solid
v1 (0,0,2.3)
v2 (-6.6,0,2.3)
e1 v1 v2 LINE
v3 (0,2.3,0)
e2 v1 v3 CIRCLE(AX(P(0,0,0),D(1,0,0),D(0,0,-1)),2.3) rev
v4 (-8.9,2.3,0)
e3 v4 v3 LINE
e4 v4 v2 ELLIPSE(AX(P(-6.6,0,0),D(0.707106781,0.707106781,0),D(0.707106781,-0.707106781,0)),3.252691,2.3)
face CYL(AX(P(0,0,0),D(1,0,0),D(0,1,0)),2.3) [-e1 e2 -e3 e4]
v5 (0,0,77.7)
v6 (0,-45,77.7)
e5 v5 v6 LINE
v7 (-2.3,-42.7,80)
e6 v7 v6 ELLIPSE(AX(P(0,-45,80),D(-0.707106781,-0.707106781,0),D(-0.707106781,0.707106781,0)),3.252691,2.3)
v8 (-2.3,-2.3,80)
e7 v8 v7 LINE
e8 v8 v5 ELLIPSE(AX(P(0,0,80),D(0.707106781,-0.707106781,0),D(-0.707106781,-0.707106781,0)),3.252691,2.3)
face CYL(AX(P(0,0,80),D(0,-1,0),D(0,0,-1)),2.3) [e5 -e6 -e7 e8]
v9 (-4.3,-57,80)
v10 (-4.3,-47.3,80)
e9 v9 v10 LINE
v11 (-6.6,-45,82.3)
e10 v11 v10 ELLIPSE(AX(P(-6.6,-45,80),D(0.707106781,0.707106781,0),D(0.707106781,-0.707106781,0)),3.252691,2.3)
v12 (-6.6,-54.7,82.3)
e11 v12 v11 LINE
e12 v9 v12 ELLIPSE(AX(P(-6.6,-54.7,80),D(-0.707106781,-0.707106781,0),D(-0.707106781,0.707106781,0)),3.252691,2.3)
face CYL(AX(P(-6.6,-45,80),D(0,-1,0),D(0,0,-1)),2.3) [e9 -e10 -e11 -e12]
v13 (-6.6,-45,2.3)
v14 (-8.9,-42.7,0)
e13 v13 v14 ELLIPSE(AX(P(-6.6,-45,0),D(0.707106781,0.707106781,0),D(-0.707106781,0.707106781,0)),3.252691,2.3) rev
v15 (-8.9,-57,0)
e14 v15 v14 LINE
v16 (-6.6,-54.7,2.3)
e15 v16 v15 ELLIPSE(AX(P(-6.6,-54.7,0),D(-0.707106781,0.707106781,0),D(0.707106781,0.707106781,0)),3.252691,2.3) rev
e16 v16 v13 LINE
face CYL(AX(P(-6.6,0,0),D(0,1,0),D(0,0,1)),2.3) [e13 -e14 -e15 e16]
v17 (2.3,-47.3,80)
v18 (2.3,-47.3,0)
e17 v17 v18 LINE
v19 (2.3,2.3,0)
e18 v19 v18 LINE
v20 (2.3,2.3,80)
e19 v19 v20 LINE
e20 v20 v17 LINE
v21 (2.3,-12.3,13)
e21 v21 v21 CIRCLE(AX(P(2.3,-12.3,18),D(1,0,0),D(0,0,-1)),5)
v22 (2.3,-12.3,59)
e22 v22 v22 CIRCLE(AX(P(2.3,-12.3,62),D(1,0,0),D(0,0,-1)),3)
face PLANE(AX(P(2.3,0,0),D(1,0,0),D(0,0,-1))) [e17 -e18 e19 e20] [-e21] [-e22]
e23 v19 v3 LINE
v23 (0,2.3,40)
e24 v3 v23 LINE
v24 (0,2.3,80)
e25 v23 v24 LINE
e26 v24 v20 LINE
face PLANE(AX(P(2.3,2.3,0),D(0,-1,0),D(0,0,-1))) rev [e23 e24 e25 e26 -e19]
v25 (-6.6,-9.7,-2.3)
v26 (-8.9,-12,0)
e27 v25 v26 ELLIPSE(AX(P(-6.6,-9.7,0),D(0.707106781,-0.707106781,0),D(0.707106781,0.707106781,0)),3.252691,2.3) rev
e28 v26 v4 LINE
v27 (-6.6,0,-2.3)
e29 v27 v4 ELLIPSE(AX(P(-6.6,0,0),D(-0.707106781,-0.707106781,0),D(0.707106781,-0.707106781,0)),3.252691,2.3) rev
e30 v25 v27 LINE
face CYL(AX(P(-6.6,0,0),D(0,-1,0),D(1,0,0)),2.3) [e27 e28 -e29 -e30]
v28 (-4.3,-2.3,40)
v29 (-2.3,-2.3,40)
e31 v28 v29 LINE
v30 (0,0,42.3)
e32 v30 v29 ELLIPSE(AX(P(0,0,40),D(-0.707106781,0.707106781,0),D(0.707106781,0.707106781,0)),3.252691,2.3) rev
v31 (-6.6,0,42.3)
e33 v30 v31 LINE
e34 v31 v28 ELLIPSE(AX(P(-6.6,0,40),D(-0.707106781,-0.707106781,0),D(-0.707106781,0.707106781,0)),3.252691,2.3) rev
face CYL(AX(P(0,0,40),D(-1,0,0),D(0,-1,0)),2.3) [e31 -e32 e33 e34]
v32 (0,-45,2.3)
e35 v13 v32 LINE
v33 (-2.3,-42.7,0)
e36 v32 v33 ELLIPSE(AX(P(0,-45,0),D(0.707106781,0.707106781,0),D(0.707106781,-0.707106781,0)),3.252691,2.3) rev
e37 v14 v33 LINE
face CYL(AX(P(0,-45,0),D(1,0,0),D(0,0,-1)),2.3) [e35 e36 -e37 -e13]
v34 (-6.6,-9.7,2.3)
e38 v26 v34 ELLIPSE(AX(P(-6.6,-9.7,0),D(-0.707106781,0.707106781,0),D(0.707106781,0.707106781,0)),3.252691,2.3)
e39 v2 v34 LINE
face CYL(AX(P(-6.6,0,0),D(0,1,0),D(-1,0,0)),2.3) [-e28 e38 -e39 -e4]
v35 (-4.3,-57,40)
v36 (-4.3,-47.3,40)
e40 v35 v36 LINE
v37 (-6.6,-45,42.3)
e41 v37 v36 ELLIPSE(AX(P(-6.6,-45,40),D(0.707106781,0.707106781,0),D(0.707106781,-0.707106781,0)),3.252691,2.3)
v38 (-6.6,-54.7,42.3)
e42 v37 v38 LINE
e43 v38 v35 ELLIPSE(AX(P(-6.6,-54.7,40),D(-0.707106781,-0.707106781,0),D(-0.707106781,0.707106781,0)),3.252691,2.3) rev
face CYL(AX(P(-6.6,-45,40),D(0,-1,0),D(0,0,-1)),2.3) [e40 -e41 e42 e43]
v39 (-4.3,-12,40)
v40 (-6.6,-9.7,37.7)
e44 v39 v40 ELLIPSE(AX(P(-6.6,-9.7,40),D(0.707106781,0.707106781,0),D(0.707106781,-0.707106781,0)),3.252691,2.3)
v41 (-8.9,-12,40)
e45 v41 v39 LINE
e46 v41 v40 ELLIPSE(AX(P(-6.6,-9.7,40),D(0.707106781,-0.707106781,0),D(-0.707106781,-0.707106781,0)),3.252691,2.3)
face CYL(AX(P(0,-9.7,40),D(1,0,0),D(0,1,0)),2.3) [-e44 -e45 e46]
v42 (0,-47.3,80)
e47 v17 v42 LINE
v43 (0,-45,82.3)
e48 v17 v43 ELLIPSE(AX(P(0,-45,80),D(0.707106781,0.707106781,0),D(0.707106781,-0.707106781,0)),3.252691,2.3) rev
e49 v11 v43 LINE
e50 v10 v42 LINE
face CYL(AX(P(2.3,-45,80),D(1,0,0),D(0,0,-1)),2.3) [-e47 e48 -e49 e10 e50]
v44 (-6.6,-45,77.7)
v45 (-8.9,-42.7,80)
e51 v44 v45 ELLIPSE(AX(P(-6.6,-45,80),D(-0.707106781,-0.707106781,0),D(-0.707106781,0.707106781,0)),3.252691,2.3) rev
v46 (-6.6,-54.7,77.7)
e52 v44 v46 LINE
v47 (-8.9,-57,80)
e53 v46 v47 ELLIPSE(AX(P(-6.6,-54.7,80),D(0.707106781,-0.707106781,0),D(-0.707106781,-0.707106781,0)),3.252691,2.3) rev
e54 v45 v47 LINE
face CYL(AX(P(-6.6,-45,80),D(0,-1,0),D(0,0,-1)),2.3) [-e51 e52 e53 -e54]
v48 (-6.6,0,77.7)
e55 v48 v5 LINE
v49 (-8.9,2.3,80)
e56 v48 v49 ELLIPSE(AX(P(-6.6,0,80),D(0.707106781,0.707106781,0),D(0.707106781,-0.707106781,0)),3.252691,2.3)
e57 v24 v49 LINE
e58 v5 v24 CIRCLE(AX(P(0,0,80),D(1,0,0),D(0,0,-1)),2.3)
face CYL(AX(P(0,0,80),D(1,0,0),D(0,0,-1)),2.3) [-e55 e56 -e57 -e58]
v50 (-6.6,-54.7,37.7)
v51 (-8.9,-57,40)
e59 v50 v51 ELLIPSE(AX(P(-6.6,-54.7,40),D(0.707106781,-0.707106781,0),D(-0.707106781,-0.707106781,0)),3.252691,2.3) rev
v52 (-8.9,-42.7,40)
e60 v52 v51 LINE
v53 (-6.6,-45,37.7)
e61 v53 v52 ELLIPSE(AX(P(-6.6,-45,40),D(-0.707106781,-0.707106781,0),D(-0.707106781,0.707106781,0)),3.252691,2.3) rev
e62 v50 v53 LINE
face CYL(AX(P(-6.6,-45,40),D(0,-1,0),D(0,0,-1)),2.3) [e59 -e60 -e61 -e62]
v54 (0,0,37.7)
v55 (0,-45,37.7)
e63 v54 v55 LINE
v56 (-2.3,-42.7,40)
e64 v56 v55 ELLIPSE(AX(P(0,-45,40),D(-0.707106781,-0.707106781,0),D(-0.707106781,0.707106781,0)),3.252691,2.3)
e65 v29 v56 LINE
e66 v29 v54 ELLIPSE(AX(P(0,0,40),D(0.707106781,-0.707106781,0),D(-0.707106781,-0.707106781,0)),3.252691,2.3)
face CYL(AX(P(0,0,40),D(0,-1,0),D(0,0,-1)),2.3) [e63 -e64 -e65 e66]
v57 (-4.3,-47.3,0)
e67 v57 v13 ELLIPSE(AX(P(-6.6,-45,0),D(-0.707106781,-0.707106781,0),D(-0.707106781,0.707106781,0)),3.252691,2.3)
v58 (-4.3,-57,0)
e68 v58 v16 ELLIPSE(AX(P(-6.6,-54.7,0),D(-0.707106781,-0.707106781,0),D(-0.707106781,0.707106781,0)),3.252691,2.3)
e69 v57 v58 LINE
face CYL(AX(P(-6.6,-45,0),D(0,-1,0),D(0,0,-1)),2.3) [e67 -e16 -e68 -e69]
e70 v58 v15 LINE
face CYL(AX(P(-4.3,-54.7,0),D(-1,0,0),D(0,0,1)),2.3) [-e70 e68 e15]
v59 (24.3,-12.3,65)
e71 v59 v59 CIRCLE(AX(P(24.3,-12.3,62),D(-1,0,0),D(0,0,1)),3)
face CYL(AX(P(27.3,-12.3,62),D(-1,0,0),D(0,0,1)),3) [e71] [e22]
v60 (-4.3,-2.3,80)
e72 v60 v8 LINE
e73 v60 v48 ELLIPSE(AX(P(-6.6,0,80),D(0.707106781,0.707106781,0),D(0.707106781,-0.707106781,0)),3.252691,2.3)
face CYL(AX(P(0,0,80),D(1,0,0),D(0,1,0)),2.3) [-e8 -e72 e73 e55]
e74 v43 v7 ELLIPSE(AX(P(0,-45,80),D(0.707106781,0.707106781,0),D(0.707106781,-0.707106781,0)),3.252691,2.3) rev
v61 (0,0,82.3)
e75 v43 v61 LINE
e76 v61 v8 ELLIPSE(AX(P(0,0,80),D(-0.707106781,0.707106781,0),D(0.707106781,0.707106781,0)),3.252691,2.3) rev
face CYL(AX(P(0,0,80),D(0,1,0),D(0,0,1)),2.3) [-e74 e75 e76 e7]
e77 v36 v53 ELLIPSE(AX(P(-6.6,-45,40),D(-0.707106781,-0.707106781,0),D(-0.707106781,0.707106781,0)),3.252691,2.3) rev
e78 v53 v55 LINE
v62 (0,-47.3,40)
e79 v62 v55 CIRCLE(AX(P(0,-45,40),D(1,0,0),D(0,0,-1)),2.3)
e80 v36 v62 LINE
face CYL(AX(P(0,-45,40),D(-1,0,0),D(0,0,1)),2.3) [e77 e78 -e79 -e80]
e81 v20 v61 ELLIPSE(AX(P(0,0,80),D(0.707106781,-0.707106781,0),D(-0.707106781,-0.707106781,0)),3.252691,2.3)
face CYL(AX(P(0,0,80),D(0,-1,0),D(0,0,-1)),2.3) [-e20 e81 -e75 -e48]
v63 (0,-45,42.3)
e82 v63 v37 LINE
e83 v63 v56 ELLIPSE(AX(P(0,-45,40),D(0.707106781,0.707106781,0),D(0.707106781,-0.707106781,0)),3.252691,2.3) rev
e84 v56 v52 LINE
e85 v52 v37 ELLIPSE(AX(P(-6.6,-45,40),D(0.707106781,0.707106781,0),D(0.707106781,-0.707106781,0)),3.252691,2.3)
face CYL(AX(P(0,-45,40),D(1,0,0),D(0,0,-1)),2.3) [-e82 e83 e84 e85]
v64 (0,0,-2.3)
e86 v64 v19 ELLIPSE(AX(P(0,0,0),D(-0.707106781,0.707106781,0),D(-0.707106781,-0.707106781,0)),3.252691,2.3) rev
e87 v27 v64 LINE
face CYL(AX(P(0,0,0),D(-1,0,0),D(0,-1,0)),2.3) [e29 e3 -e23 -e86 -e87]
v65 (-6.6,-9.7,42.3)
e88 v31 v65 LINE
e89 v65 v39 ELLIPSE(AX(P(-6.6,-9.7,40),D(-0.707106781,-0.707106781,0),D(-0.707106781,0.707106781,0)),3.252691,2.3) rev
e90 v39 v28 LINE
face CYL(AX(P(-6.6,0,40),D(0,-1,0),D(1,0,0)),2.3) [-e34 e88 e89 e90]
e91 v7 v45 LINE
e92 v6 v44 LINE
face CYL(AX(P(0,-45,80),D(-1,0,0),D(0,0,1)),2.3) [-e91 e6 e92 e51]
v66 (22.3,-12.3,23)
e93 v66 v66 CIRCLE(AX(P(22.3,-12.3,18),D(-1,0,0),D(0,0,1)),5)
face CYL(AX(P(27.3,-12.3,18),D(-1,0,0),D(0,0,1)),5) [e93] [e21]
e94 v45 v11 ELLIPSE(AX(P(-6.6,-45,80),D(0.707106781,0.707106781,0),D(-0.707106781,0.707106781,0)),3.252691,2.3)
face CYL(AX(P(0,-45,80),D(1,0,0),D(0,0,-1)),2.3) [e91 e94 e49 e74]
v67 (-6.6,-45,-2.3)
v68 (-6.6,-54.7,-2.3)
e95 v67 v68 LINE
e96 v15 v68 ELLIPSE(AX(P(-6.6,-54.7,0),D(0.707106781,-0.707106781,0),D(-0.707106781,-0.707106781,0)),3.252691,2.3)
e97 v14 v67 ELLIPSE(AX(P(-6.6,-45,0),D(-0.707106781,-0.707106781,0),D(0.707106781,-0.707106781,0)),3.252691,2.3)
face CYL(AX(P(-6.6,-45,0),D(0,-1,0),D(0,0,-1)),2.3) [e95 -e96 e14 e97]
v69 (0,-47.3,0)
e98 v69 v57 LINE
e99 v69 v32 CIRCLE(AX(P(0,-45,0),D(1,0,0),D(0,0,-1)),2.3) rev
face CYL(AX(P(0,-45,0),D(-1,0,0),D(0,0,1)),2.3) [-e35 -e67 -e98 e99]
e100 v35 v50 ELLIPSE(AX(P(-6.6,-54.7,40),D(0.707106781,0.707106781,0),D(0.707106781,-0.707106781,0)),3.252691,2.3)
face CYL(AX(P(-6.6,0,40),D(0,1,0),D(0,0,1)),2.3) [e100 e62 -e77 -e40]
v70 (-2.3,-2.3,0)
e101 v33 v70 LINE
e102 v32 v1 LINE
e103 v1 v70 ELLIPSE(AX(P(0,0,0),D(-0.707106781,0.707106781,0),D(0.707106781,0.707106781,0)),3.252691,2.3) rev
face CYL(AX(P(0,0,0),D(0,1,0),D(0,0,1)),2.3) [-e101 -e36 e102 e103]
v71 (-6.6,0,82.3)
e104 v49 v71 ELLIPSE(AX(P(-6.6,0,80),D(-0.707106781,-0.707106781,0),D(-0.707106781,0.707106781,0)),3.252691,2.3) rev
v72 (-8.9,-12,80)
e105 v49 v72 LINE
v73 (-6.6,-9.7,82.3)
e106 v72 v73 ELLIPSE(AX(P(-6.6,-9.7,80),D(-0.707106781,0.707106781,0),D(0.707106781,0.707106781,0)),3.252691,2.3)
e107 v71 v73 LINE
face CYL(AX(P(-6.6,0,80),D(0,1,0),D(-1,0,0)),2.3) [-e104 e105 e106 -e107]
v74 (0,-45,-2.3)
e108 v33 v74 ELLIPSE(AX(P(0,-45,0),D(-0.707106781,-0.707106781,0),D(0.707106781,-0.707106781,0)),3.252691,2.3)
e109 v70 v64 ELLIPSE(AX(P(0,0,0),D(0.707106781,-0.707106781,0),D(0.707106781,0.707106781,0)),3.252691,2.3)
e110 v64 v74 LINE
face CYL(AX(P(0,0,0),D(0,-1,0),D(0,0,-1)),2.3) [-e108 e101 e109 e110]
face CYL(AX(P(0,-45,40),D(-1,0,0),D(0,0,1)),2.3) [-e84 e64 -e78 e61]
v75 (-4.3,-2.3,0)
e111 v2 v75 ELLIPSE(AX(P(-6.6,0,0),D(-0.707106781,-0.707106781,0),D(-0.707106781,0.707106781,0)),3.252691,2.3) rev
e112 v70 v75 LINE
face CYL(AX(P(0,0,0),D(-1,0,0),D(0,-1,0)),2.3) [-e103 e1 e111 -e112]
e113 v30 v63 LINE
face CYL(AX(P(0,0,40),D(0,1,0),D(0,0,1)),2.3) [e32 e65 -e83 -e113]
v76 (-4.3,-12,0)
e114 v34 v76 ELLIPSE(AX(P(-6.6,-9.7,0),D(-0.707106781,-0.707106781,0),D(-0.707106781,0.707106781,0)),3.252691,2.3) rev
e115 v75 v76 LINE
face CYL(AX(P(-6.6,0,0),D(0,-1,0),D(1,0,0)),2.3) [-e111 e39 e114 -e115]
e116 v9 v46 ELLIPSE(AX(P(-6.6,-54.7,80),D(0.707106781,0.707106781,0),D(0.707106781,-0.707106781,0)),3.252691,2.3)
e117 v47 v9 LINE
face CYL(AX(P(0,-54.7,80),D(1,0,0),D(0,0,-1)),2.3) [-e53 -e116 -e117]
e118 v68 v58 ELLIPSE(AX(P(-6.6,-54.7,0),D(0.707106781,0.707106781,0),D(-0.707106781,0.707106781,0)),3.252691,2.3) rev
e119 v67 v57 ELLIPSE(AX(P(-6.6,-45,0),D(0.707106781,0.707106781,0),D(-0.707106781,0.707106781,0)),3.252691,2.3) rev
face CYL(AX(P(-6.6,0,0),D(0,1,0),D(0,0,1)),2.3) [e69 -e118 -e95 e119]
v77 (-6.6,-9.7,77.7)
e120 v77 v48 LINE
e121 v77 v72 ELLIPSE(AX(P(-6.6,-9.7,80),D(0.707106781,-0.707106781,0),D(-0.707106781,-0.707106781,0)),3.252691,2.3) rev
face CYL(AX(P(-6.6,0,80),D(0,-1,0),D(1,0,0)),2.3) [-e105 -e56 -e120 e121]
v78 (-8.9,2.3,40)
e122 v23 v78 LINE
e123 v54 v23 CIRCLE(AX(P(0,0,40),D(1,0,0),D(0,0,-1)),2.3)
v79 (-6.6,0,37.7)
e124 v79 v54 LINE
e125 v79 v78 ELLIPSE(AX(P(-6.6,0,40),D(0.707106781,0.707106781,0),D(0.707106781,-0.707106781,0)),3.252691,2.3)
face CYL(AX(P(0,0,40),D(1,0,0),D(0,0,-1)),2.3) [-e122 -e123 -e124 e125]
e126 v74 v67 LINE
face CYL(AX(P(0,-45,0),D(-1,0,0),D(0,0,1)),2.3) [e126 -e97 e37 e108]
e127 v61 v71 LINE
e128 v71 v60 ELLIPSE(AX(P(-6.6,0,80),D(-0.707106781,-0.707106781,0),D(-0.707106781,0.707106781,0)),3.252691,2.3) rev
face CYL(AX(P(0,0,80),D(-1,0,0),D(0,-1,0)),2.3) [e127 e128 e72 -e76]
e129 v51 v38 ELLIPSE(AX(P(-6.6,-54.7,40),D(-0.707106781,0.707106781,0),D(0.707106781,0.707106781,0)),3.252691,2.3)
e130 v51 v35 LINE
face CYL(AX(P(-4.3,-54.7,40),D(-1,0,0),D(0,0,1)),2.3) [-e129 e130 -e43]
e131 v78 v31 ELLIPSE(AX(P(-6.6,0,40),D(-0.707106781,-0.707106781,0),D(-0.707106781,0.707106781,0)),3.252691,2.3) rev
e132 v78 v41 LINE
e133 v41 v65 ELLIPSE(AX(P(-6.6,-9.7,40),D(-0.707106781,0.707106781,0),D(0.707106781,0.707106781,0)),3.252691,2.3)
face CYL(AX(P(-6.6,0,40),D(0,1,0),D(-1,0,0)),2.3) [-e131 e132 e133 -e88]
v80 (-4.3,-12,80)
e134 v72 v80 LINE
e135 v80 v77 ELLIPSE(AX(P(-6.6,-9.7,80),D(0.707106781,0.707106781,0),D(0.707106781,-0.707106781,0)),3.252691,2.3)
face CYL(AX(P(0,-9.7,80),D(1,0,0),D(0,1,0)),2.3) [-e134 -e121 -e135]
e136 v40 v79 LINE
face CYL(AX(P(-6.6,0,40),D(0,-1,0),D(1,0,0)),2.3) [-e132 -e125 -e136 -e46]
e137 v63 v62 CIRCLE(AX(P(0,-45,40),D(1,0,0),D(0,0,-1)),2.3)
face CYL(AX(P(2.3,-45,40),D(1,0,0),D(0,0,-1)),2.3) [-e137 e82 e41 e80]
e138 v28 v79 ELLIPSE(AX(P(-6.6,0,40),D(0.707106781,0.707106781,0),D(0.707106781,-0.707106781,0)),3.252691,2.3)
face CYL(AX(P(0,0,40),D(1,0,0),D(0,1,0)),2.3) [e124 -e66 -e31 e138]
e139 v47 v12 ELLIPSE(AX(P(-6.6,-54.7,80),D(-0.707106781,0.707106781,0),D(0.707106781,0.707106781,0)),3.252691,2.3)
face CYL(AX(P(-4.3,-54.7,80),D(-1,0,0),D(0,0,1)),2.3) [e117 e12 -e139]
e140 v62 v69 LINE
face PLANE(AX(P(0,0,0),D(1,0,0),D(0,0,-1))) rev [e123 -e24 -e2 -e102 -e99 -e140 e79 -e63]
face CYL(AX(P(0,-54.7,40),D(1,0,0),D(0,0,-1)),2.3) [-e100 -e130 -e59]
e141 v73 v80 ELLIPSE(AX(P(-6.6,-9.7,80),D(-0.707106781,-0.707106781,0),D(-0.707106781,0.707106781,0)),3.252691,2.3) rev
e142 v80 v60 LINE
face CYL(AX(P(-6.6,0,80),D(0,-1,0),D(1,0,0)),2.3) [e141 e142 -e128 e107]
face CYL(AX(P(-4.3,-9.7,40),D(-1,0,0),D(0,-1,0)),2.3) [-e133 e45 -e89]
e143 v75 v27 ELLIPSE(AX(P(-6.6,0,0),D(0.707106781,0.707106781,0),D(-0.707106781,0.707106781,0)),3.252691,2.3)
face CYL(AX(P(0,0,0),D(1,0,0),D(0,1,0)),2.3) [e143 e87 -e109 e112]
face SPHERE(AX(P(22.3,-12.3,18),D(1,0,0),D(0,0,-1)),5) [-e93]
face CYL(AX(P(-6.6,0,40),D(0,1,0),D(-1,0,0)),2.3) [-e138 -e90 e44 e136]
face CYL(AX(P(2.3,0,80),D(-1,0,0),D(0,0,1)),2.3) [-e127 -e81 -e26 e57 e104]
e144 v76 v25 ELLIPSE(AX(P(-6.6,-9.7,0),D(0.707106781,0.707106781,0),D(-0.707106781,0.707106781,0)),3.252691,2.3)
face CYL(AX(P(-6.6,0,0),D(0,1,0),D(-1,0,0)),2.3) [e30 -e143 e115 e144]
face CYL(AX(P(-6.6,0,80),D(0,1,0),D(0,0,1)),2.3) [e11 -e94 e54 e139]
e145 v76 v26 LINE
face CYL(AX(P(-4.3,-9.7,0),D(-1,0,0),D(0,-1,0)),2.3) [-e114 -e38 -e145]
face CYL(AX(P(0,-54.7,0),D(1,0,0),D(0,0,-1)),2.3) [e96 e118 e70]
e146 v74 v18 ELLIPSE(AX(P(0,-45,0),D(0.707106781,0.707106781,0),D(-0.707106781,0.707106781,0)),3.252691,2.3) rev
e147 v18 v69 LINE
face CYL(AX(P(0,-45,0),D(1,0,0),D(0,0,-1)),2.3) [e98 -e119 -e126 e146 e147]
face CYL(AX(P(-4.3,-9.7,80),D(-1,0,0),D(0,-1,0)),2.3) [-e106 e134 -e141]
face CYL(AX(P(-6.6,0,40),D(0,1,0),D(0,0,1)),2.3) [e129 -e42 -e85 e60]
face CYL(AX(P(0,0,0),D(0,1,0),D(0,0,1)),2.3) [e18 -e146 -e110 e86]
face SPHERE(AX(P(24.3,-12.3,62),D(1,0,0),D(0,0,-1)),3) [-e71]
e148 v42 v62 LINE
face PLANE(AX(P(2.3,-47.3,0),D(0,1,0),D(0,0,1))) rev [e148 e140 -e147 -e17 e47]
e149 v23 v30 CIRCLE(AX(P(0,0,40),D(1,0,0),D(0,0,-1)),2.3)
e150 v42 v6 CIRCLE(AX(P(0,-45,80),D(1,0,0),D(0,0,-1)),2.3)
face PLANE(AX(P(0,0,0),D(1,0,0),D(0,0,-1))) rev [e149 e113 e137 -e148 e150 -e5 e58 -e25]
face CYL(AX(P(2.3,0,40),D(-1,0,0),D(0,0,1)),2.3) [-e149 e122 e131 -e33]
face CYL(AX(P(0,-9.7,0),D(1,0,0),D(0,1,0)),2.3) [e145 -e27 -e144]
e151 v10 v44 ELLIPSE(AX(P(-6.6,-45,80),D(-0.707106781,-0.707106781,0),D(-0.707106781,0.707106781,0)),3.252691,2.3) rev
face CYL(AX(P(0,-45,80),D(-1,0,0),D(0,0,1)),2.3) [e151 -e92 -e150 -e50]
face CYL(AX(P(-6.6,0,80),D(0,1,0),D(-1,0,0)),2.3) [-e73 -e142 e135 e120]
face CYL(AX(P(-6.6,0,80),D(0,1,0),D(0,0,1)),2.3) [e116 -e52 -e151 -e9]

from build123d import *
from OCP.BRepFilletAPI import BRepFilletAPI_MakeFillet

# Parameters (mm, degrees)
EXTRU_MINCE1_DEPTH           = 2.3
CONG_1_R                     = 2.3
ESQUISSE2_W                  = 80
ESQUISSE2_H                  = 49.6
BOSS_EXTRU_1_DEPTH           = 2.3
R_P_TITION_START             = 77.7
R_P_TITION_LIN_AIRE1_DEPTH   = 4.6
R_P_TITION_START_2           = 37.7
R_P_TITION_LIN_AIRE1_2_DEPTH = 4.6
CONG_2_R                     = 2.3
ESQUISSE3_R                  = 3
ESQUISSE3_R_2                = 5
BOSS_EXTRU_2_DEPTH           = 25
CONG_5_R1                    = 3
CONG_5_R2                    = 5


# Read off the part's stored shape, not the designer's step: Répétition linéaire1
with BuildPart() as part:
    # Esquisse1 → Extru.-Mince1 (new, symmetric)
    with BuildSketch(Plane.XY):
        Polygon((-4.3, -57), (-4.3, -47.3), (2.3, -47.3), (2.3, 2.3), (-8.9, 2.3), (-8.9, -12), (-4.3, -12), (-4.3, -2.3), (-2.3, -2.3), (-2.3, -42.7), (-8.9, -42.7), (-8.9, -57), align=None)
    extrude(amount=EXTRU_MINCE1_DEPTH, both=True)

    # Congé1
    cong_1_edges = [part.edges().sort_by_distance(p)[0] for p in [
        (-6.6, -57, -2.3),
        (-4.3, -52.15, -2.3),
        (-1, -47.3, -2.3),
        (2.3, -22.5, -2.3),
        (-3.3, 2.3, -2.3),
        (-8.9, -4.85, -2.3),
        (-6.6, -12, -2.3),
        (-4.3, -7.15, -2.3),
        (-3.3, -2.3, -2.3),
        (-2.3, -22.5, -2.3),
        (-5.6, -42.7, -2.3),
        (-8.9, -49.85, -2.3),
        (-5.6, -42.7, 2.3),
        (-2.3, -22.5, 2.3),
        (-3.3, -2.3, 2.3),
        (-4.3, -7.15, 2.3),
        (-6.6, -12, 2.3),
        (-8.9, -4.85, 2.3),
        (-3.3, 2.3, 2.3),
        (2.3, -22.5, 2.3),
        (-1, -47.3, 2.3),
        (-4.3, -52.15, 2.3),
        (-6.6, -57, 2.3),
        (-8.9, -49.85, 2.3),
    ]]
    fillet(cong_1_edges, radius=CONG_1_R - 0.0001)  # a hair under: the kernel refuses the full size

    # Esquisse2 → Boss.-Extru.1 (add)
    with BuildSketch(Plane(origin=(0, 0, 0), x_dir=(0, 0, -1), z_dir=(1, 0, 0))):
        with Locations((-40, -22.5)):
            Rectangle(ESQUISSE2_W, ESQUISSE2_H)
    extrude(amount=BOSS_EXTRU_1_DEPTH)

    # Répétition linéaire1 outline → Répétition linéaire1 (add)
    with BuildSketch(Plane.XY.offset(R_P_TITION_START)):
        Polygon((-8.9, 2.3), (-8.9, -12), (-4.3, -12), (-4.3, -2.3), (-2.3, -2.3), (-2.3, -42.7), (-8.9, -42.7), (-8.9, -57), (-4.3, -57), (-4.3, -47.3), (2.3, -47.3), (2.3, 2.3), align=None)
    extrude(amount=R_P_TITION_LIN_AIRE1_DEPTH)

    # R_p_tition lin_aire1 2 outline → R_p_tition lin_aire1 2 (add)
    with BuildSketch(Plane.XY.offset(R_P_TITION_START_2)):
        Polygon((0, 2.3), (-8.9, 2.3), (-8.9, -12), (-4.3, -12), (-4.3, -2.3), (-2.3, -2.3), (-2.3, -42.7), (-8.9, -42.7), (-8.9, -57), (-4.3, -57), (-4.3, -47.3), (0, -47.3), align=None)
    extrude(amount=R_P_TITION_LIN_AIRE1_2_DEPTH)

    # Congé2
    cong_2_edges = [part.edges().sort_by_distance(p)[0] for p in [
        (2.3, -22.5, 82.3),
        (-1, -47.3, 82.3),
        (-3.3, 2.3, 82.3),
        (-4.45, 2.3, 77.7),
        (-2.15, -47.3, 77.7),
        (-4.3, -52.15, 77.7),
        (-6.6, -57, 77.7),
        (-6.6, -12, 77.7),
        (-8.9, -4.85, 77.7),
        (-8.9, -49.85, 77.7),
        (-6.6, -57, 82.3),
        (-4.3, -52.15, 82.3),
        (-8.9, -4.85, 82.3),
        (-6.6, -12, 82.3),
        (-4.3, -7.15, 77.7),
        (-3.3, -2.3, 77.7),
        (-2.3, -22.5, 77.7),
        (-5.6, -42.7, 77.7),
        (-8.9, -49.85, 82.3),
        (-4.3, -7.15, 82.3),
        (-3.3, -2.3, 82.3),
        (-2.3, -22.5, 82.3),
        (-5.6, -42.7, 82.3),
        (-2.15, -47.3, 42.3),
        (-4.45, 2.3, 42.3),
        (-4.3, -7.15, 42.3),
        (-3.3, -2.3, 42.3),
        (-2.3, -22.5, 42.3),
        (-5.6, -42.7, 42.3),
        (-8.9, -49.85, 42.3),
        (-4.45, 2.3, 37.7),
        (-2.15, -47.3, 37.7),
        (-4.3, -52.15, 37.7),
        (-6.6, -57, 37.7),
        (-6.6, -12, 37.7),
        (-8.9, -4.85, 37.7),
        (-8.9, -49.85, 37.7),
        (-6.6, -57, 42.3),
        (-4.3, -52.15, 42.3),
        (-8.9, -4.85, 42.3),
        (-6.6, -12, 42.3),
        (-4.3, -7.15, 37.7),
        (-3.3, -2.3, 37.7),
        (-2.3, -22.5, 37.7),
        (-5.6, -42.7, 37.7),
    ]]
    fillet(cong_2_edges, radius=CONG_2_R - 0.0001)  # a hair under: the kernel refuses the full size

    # Esquisse3 → Boss.-Extru.2 (add)
    with BuildSketch(Plane(origin=(2.3, 0, 0), x_dir=(0, 0, -1), z_dir=(1, 0, 0))):
        with Locations((-62, -12.3)):
            Circle(ESQUISSE3_R)
        with Locations((-18, -12.3)):
            Circle(ESQUISSE3_R_2)
    extrude(amount=BOSS_EXTRU_2_DEPTH)

    # Congé5: one fillet with a radius per group of edges: ONE call of the kernel's fillet builder (fillet() takes one radius for all edges)
    cong_5_edges_1 = [part.edges().sort_by_distance(p)[0] for p in [
        (27.3, -12.3, 65),
    ]]
    cong_5_edges_2 = [part.edges().sort_by_distance(p)[0] for p in [
        (27.3, -12.3, 23),
    ]]
    cong_5 = BRepFilletAPI_MakeFillet(part.part.solid().wrapped)
    for e in cong_5_edges_1:
        cong_5.Add(CONG_5_R1, e.wrapped)
    for e in cong_5_edges_2:
        cong_5.Add(CONG_5_R2, e.wrapped)
    add(Compound.cast(cong_5.Shape()), mode=Mode.REPLACE)


solid = part.part
